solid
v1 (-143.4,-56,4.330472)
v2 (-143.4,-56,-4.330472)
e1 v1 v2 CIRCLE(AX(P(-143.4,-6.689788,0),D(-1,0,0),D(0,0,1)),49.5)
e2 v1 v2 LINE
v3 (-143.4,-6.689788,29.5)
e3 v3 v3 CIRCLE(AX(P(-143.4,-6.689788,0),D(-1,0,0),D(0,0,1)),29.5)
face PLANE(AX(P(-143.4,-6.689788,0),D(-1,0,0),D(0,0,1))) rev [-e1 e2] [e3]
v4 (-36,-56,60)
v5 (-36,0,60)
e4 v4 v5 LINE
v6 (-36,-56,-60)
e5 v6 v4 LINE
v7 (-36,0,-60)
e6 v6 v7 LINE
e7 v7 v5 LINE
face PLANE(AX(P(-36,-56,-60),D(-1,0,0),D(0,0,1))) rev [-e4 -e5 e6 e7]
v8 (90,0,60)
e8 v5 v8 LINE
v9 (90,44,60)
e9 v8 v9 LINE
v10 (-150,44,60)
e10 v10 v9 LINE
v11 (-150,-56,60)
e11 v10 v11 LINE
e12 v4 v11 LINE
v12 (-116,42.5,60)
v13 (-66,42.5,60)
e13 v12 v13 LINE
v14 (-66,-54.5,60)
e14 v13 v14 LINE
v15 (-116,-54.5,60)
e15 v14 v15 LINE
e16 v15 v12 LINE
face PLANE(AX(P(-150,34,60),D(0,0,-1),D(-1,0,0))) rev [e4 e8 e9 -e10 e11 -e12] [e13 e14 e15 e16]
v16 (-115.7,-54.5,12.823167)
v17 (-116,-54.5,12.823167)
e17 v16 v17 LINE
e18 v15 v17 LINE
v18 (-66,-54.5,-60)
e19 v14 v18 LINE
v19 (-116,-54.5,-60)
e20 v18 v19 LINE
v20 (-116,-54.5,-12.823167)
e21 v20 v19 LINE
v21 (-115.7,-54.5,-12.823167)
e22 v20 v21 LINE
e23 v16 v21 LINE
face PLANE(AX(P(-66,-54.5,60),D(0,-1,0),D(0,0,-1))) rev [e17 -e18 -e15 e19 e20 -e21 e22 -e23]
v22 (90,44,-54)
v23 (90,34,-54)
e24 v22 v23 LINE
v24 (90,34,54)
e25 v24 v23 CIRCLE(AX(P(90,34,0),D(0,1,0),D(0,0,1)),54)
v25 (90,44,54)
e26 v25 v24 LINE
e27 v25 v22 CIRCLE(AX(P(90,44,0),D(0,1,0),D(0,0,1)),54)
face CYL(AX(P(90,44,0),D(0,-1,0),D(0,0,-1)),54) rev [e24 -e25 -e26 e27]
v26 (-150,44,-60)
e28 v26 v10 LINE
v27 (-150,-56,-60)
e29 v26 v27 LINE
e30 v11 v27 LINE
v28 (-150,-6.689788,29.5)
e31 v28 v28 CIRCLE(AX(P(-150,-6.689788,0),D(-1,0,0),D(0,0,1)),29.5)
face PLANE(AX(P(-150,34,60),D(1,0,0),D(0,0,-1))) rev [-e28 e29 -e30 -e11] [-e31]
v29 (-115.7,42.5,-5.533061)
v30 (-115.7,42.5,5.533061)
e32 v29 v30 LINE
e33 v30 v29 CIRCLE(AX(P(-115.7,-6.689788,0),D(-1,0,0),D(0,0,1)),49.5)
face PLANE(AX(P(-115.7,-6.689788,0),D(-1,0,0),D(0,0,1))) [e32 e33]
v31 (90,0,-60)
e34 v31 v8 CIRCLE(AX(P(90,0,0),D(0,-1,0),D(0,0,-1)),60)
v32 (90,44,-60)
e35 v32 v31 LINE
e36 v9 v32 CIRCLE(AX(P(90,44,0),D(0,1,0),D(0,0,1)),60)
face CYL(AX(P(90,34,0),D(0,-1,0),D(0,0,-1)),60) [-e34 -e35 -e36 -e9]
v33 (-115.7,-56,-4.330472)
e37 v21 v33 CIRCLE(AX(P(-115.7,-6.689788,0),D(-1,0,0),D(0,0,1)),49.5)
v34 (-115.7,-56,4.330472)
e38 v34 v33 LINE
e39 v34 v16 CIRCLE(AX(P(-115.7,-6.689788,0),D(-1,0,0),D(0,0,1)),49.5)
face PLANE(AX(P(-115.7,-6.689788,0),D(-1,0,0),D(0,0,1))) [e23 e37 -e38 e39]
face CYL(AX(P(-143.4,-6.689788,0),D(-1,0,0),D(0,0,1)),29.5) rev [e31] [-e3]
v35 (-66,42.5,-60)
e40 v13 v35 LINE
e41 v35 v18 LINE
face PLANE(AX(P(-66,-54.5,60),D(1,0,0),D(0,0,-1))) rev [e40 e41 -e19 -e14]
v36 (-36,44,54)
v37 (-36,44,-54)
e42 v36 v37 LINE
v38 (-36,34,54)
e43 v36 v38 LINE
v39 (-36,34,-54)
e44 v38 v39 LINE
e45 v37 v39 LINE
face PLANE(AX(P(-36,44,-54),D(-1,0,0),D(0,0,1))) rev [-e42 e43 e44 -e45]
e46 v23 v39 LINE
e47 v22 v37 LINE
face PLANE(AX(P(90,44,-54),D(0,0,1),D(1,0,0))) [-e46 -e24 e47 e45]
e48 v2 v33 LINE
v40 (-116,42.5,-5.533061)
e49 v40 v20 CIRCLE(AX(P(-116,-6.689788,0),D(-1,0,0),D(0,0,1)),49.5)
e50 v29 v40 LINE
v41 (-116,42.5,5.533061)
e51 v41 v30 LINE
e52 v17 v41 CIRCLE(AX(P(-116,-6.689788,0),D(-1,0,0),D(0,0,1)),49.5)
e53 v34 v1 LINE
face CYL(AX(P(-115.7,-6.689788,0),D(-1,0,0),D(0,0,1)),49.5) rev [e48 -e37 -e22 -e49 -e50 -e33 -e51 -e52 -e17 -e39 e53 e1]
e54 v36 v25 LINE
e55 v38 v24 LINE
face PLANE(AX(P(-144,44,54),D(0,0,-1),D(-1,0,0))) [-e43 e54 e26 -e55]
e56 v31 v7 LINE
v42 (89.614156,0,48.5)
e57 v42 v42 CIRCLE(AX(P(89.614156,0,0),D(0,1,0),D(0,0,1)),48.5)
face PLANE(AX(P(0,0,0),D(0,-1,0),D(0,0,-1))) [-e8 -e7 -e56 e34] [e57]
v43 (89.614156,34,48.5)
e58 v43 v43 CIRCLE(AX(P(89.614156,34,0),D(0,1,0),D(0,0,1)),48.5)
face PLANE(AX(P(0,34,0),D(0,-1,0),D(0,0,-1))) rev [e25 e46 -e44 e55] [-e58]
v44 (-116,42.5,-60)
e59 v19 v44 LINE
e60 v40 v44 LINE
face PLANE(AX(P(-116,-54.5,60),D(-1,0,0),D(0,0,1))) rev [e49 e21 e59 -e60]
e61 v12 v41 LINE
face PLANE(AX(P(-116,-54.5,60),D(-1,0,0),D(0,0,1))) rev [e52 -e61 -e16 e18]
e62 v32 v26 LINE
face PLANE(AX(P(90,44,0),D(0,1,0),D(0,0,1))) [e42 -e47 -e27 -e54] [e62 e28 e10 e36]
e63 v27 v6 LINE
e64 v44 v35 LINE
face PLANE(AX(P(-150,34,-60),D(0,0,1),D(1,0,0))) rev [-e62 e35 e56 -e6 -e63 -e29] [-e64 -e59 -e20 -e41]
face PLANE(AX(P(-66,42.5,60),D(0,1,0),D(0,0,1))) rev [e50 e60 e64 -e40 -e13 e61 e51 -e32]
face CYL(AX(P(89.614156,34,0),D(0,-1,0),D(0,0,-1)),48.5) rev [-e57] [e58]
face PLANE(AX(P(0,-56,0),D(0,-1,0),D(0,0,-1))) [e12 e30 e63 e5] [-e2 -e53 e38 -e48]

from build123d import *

# Parameters (mm, degrees)
SKETCH_1_W          = 300
SKETCH_1_H          = 120
SKETCH_1_R          = 48.5
EXTRUDE_1_DEPTH     = 34
FILLET_2_RADIUS     = 60
FILLET_2_LENGTH     = 34
EXTRUDE_4_DEPTH     = 10
FILLET_3_R          = 54
EXTRUDE_START       = -144
EXTRUDE_5_OUTLINE_W = 10
EXTRUDE_5_OUTLINE_H = 108
EXTRUDE_5_DEPTH     = 108
SKETCH_17_W         = 114
SKETCH_17_H         = 120
EXTRUDE_9_DEPTH     = 56
SKETCH_18_W         = 50
SKETCH_18_H         = 97
CUT_EXTRUDE_1_DEPTH = 201.089979759
SKETCH_20_R         = 29.5
CUT_EXTRUDE_2_DEPTH = 6.6
SKETCH_21_R         = 49.5
CUT_EXTRUDE_3_DEPTH = 27.7


# Read off the part's stored shape, not the designer's step: 凸台-拉伸5
with BuildPart() as part:
    # 草图1 → 凸台-拉伸1 (new body)
    with BuildSketch(Plane(origin=(0, 0, 0), x_dir=(1, 0, 0), z_dir=(0, 1, 0))):
        Rectangle(SKETCH_1_W, SKETCH_1_H)
        with Locations(Location((89.61415623, 0, 0), (0, 0, 270))):
            Circle(SKETCH_1_R, mode=Mode.SUBTRACT)
    extrude(amount=EXTRUDE_1_DEPTH)

    # 圆角2: full round fillet: the end face becomes a half cylinder, R = half its width
    fillet_2_face = Plane((150, 17, 0), x_dir=(0, -1, 0), z_dir=(1, 0, 0))  # on the end face: x along it, z out of the body
    fillet_2_slab = fillet_2_face.offset(-FILLET_2_RADIUS / 2) * Box(FILLET_2_LENGTH, 2 * FILLET_2_RADIUS, FILLET_2_RADIUS, mode=Mode.PRIVATE)  # the body's end, R deep
    fillet_2_round = Plane((90, 17, 0), x_dir=(1, 0, 0), z_dir=(0, -1, 0)) * Cylinder(FILLET_2_RADIUS, FILLET_2_LENGTH, mode=Mode.PRIVATE)  # its axis R under the face
    add(fillet_2_slab - fillet_2_round, mode=Mode.SUBTRACT)

    # 草图3 → 凸台-拉伸4 (add)
    with BuildSketch(Plane(origin=(0, 34, 0), x_dir=(1, 0, 0), z_dir=(0, 1, 0))):
        with BuildLine():
            Line((-150, -60), (90, -60))
            ThreePointArc((90, -60), (150, 0), (90, 60))
            Line((90, 60), (-150, 60))
            Line((-150, 60), (-150, -60))
        make_face()
        with BuildLine():
            Line((-144, -54), (90, -54))
            ThreePointArc((90, -54), (144, 0), (90, 54))
            Line((90, 54), (-144, 54))
            Line((-144, 54), (-144, -54))
        make_face(mode=Mode.SUBTRACT)
    extrude(amount=EXTRUDE_4_DEPTH)

    # 圆角3
    fillet_3_edges = [part.edges().sort_by_distance(p)[0] for p in [
        (-144, 39, 54),
        (-144, 39, -54),
    ]]
    fillet(fillet_3_edges, radius=FILLET_3_R - 0.0001)  # a hair under: the kernel refuses the full size

    # 凸台-拉伸5 outline → 凸台-拉伸5 (add)
    with BuildSketch(Plane.YZ.offset(EXTRUDE_START)):
        with Locations((39, 0)):
            Rectangle(EXTRUDE_5_OUTLINE_W, EXTRUDE_5_OUTLINE_H)
    extrude(amount=EXTRUDE_5_DEPTH)

    # 草图17 → 凸台-拉伸9 (add)
    with BuildSketch(Plane.XZ):
        with Locations((-93, 0)):
            Rectangle(SKETCH_17_W, SKETCH_17_H)
    extrude(amount=EXTRUDE_9_DEPTH)

    # 草图18 → 切除-拉伸1 (cut, through all)
    with BuildSketch(Plane(origin=(0, 0, -60), x_dir=(-1, 0, 0), z_dir=(0, 0, -1))):
        with Locations((91, -6)):
            Rectangle(SKETCH_18_W, SKETCH_18_H)
    extrude(amount=-CUT_EXTRUDE_1_DEPTH, mode=Mode.SUBTRACT)

    # 草图20 → 切除-拉伸2 (cut)
    with BuildSketch(Plane.ZY.offset(150)):
        with Locations((0, -6.689787926)):
            Circle(SKETCH_20_R)
    extrude(amount=-CUT_EXTRUDE_2_DEPTH, mode=Mode.SUBTRACT)

    # 草图21 → 切除-拉伸3 (cut)
    with BuildSketch(Plane.ZY.offset(143.4)):
        with Locations((0, -6.689787926)):
            Circle(SKETCH_21_R)
    extrude(amount=-CUT_EXTRUDE_3_DEPTH, mode=Mode.SUBTRACT)


solid = part.part
